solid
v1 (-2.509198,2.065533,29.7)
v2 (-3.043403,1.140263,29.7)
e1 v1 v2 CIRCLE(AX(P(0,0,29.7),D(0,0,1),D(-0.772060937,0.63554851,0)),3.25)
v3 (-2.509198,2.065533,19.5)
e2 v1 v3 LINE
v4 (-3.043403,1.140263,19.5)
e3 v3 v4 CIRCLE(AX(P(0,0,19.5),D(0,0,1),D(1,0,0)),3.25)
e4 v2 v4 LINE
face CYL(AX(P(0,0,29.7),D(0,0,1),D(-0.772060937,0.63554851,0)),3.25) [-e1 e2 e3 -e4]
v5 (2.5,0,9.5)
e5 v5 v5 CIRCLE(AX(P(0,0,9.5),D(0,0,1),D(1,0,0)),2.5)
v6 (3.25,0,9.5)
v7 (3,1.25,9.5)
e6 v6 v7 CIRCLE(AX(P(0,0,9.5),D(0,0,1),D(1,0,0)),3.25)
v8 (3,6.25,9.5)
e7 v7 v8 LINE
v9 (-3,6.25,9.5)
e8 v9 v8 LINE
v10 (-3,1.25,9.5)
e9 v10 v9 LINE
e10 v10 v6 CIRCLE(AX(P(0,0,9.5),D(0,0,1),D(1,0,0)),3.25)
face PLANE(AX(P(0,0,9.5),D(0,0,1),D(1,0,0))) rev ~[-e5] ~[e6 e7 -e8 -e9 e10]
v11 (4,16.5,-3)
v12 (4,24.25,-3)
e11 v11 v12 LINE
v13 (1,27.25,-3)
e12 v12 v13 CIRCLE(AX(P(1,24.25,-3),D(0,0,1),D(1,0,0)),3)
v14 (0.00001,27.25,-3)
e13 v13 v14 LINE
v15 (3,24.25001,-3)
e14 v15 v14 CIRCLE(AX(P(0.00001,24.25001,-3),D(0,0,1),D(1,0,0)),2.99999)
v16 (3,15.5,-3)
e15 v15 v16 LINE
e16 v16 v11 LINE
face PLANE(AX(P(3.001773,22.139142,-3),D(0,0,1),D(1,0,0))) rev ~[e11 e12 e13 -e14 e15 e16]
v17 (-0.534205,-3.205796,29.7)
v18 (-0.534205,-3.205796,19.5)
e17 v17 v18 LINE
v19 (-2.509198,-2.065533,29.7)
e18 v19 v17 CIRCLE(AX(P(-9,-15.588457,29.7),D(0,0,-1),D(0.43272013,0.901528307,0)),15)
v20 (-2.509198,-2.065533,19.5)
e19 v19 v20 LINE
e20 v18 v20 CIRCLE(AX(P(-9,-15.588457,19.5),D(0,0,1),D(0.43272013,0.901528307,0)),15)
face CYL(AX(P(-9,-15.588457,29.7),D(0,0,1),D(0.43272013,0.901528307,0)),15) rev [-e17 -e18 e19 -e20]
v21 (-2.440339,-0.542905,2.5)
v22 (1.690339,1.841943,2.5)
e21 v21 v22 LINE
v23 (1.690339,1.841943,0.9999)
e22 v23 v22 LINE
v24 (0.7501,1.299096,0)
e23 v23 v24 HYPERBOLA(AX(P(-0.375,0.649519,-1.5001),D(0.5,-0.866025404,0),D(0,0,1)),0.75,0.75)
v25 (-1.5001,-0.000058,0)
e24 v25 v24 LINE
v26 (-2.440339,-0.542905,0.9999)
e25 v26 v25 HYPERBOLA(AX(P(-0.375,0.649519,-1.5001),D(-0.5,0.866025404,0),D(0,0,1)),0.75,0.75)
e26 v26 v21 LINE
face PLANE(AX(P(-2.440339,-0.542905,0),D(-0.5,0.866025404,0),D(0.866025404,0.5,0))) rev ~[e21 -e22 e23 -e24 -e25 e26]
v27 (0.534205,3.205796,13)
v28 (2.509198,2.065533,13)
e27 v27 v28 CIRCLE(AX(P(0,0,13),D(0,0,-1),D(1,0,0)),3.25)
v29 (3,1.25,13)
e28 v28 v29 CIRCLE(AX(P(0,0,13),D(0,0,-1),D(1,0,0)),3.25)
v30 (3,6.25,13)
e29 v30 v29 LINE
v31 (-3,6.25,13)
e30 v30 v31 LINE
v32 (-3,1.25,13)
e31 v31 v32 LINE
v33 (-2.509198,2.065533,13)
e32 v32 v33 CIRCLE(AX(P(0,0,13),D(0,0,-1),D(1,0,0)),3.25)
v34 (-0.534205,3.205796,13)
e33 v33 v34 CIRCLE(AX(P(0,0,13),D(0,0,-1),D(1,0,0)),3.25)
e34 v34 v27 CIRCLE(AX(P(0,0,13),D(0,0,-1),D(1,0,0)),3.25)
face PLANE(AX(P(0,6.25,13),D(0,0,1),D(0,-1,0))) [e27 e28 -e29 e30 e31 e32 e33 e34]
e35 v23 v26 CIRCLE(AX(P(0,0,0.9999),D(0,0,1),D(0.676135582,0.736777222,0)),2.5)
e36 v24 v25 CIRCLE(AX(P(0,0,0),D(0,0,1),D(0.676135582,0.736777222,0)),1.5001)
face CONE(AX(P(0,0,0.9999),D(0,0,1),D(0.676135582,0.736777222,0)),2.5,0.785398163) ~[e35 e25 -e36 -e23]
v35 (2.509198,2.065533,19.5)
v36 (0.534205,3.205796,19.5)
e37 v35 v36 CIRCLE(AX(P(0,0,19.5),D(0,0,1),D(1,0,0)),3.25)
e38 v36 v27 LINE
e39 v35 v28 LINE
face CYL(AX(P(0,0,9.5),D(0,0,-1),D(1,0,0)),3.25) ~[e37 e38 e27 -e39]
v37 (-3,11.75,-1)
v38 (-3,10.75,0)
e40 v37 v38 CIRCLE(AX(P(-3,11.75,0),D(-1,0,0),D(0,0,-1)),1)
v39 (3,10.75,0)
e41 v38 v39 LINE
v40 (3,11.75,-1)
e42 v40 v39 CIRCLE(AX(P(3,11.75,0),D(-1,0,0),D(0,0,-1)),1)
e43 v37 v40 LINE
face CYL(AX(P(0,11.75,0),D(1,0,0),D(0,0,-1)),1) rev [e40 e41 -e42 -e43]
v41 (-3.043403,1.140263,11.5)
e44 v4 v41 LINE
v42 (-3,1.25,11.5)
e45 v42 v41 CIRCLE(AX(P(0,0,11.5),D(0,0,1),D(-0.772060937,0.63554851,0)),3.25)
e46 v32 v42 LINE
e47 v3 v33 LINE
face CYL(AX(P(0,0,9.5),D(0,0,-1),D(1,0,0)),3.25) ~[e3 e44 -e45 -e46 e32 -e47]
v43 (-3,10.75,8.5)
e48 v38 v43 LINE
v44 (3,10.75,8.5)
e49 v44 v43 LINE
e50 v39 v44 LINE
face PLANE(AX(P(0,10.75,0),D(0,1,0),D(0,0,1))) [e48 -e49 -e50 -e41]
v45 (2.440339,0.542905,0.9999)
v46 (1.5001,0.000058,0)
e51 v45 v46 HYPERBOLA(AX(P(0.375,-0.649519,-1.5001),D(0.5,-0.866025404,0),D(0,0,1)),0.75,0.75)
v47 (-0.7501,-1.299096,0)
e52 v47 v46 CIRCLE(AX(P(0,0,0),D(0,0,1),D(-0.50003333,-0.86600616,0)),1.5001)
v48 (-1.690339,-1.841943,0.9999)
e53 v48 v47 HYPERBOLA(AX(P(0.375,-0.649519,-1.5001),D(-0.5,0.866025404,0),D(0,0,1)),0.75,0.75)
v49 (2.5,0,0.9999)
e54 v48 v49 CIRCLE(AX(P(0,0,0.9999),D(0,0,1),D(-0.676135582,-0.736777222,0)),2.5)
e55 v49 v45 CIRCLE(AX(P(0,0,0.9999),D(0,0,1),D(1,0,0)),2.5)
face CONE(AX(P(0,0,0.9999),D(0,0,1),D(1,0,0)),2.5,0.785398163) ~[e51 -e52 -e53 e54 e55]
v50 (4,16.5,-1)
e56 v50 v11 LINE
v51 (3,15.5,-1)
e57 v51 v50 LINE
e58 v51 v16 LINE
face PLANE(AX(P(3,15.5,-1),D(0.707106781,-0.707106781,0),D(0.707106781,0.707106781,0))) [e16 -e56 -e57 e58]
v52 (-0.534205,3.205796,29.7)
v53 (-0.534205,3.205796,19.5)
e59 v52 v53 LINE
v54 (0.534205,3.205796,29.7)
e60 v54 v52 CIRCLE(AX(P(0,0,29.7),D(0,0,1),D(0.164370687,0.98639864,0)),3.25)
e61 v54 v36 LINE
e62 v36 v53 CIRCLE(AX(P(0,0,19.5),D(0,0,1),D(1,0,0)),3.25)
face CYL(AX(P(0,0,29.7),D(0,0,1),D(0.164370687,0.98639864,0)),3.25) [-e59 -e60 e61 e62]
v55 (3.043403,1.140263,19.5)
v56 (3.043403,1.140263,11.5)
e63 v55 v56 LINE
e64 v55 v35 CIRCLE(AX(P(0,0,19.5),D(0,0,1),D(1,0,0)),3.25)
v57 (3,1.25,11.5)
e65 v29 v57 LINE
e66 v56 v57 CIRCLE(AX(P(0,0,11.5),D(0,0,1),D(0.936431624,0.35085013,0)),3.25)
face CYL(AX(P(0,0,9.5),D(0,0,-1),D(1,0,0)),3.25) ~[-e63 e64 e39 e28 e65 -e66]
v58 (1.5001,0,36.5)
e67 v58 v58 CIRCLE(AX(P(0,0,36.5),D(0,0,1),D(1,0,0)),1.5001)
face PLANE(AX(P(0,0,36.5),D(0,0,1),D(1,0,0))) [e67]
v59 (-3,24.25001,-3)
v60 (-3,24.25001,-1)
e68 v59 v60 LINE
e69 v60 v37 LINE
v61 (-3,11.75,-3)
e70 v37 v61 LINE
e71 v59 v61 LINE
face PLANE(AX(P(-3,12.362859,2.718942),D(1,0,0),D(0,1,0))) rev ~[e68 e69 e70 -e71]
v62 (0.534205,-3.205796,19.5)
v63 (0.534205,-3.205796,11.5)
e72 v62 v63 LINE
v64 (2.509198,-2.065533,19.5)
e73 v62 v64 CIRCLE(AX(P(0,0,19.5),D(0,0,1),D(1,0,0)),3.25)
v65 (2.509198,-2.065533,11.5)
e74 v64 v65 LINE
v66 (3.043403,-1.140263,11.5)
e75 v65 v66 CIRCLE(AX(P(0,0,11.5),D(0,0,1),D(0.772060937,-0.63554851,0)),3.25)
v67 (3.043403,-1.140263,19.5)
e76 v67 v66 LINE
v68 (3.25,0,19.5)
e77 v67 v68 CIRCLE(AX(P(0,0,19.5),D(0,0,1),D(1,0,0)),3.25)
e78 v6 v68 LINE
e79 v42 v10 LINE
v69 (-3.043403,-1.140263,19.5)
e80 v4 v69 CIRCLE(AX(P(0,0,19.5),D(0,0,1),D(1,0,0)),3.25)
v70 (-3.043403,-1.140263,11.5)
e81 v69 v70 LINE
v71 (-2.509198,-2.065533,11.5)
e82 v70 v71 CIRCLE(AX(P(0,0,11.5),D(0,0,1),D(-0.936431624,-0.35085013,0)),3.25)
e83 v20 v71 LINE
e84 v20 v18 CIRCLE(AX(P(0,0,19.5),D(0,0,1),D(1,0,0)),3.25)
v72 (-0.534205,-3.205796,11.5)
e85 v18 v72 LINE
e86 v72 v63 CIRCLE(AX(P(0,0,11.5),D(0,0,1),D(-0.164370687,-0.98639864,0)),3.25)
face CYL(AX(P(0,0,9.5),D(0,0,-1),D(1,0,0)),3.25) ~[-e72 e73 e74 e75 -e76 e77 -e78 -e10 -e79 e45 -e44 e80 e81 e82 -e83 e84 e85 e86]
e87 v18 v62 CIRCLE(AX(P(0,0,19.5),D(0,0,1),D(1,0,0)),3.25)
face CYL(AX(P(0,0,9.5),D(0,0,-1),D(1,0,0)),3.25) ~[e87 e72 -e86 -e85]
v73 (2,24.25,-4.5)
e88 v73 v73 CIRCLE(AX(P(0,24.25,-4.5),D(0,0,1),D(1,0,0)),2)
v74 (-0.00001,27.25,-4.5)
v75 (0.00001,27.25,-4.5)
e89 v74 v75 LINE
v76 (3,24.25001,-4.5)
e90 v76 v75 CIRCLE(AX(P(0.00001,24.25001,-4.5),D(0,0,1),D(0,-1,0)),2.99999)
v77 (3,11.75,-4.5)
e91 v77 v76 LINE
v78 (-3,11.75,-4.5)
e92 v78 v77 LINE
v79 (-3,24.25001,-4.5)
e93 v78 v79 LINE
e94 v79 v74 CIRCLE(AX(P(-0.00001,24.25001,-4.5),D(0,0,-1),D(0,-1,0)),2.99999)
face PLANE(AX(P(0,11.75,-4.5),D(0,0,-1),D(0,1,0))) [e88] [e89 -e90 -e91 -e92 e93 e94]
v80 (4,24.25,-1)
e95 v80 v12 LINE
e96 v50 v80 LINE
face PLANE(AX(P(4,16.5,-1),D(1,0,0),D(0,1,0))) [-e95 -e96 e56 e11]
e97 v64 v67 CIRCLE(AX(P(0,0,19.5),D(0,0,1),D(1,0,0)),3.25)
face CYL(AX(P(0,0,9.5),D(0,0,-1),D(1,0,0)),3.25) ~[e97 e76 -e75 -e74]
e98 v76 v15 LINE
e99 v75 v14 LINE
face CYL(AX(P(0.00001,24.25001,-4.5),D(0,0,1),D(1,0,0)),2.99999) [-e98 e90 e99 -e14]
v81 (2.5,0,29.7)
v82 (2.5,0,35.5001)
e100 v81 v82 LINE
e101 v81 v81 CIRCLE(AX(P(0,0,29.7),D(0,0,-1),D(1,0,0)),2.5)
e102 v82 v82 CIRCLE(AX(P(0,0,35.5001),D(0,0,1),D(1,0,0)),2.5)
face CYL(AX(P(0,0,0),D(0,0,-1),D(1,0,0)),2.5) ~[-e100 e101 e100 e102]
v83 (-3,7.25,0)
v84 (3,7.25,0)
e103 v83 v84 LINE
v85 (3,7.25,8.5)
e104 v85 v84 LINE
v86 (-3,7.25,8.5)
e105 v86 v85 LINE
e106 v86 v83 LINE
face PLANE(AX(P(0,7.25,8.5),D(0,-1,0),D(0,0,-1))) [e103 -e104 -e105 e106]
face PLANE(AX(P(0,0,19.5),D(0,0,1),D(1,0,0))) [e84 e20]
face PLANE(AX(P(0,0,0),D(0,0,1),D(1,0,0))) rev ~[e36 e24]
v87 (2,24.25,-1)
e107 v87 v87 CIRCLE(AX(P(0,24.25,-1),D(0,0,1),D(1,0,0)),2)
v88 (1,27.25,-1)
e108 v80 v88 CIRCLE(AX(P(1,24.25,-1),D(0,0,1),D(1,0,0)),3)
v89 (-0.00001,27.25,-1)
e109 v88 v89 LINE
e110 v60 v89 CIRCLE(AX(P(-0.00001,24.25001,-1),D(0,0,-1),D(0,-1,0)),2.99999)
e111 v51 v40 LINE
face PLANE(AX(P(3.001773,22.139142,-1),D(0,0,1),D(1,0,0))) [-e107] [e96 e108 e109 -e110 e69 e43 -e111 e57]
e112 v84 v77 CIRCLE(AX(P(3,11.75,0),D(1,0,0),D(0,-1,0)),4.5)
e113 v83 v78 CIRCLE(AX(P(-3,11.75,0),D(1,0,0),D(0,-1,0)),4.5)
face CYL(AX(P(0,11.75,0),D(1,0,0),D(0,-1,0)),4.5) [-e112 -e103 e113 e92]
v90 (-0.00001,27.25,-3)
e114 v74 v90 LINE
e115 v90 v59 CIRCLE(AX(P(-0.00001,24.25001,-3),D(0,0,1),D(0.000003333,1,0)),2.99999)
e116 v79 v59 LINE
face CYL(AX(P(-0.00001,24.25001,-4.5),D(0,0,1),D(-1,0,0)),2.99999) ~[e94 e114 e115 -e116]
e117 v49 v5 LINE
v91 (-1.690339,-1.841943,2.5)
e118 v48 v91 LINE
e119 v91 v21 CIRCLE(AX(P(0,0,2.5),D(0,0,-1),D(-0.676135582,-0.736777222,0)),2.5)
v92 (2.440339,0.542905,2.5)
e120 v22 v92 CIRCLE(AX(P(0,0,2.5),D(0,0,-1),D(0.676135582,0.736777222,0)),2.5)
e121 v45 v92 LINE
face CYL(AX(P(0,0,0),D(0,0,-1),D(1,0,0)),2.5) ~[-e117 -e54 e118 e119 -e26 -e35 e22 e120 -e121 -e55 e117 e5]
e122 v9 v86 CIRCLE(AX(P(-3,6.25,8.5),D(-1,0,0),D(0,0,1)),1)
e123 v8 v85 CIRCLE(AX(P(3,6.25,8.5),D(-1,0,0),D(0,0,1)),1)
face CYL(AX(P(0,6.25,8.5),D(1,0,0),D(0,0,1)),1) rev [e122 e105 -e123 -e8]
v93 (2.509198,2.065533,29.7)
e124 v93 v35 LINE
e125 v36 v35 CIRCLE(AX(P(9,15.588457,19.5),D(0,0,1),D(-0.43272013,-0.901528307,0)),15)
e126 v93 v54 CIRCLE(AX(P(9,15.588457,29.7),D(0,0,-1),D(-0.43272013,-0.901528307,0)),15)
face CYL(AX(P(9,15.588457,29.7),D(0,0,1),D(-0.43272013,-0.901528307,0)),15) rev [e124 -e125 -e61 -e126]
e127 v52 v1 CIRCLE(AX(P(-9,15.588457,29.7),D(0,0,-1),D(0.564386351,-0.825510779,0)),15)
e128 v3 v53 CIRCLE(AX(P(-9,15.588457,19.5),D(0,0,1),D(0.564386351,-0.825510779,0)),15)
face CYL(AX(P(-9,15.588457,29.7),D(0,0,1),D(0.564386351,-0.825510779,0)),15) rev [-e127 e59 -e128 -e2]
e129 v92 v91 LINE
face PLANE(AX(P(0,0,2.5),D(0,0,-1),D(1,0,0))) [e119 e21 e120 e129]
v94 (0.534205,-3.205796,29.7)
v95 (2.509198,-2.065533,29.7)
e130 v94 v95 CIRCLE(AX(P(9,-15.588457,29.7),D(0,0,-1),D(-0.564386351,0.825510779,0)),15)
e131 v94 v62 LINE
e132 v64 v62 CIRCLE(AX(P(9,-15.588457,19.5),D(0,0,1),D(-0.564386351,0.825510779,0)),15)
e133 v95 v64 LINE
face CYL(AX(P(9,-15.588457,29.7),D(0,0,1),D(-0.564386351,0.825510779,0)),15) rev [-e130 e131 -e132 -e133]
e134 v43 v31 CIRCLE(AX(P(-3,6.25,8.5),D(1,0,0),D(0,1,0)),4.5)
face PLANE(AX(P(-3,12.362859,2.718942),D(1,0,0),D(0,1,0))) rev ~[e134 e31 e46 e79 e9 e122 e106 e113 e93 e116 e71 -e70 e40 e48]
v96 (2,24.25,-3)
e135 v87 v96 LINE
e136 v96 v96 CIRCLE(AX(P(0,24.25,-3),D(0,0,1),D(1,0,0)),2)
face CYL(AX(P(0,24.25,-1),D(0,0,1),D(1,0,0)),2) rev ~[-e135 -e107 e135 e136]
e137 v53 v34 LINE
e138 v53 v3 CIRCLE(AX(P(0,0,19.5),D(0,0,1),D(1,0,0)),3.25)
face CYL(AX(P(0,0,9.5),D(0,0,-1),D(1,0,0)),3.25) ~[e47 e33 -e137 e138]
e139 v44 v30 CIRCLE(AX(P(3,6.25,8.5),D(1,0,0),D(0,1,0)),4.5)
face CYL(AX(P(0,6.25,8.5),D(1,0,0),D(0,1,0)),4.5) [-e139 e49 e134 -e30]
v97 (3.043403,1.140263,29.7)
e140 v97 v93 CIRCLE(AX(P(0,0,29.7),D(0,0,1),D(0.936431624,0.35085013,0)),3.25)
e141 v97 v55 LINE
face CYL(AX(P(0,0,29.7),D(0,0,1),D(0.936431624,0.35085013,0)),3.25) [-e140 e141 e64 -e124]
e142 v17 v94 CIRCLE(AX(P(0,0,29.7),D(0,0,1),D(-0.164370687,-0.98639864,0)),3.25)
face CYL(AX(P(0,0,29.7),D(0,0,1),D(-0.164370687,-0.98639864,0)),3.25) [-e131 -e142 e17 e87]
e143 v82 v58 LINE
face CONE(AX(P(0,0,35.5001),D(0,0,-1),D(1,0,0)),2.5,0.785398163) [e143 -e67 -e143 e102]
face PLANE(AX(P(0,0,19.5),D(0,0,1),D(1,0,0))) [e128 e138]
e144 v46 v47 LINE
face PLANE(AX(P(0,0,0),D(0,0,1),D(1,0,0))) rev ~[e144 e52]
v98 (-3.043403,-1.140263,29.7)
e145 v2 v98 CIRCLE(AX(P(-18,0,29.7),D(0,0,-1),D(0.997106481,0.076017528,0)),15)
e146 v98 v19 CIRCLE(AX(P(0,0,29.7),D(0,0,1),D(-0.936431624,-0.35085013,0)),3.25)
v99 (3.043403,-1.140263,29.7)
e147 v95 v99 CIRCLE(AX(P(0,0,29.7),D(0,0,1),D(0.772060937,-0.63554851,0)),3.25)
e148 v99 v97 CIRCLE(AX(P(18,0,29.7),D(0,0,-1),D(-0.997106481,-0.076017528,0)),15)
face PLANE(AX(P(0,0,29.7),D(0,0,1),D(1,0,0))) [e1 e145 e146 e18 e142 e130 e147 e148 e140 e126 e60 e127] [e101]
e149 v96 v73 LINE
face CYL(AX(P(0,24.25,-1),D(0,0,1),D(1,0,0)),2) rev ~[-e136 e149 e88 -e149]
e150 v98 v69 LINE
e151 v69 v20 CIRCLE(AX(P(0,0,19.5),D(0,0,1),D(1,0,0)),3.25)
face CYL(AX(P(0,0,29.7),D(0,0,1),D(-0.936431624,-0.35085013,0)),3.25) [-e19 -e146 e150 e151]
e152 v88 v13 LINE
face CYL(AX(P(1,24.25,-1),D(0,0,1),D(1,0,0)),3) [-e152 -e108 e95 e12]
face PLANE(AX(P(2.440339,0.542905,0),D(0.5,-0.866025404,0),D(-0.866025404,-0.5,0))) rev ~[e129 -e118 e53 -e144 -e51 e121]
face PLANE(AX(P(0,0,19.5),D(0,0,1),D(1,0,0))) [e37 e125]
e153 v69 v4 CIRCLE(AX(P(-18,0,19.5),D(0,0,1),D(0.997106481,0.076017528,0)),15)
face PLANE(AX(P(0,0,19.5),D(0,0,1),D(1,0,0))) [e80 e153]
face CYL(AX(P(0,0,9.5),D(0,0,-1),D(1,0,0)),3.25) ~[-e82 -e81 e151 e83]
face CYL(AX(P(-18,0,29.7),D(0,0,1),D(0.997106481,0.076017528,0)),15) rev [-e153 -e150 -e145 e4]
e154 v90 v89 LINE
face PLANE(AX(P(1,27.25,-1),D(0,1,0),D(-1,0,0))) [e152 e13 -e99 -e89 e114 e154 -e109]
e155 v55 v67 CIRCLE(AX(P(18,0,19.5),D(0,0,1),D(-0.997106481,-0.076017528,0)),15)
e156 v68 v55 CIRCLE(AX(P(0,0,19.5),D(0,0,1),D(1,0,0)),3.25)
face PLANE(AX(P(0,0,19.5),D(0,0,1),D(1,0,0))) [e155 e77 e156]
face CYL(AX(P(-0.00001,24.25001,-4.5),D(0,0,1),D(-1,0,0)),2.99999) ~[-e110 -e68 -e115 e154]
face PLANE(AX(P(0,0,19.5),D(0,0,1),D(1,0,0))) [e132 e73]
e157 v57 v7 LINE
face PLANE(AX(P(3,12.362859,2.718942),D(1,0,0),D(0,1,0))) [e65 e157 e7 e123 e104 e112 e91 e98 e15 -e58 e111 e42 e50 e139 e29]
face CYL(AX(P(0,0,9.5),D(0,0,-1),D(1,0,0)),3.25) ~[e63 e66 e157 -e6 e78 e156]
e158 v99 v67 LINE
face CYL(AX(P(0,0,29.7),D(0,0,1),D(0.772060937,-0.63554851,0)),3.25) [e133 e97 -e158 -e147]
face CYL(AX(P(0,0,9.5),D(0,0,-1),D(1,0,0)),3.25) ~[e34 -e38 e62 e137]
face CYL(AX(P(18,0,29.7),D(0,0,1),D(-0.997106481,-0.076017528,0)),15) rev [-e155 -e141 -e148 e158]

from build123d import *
from build123d import SkipClean  # not in build123d's __all__

# Parameters (mm, degrees)
F0_R      = 2.5
F1_DEPTH  = 36.5
F3_START  = 9.5
F2_R      = 3.25
F3_DEPTH  = 10
F5_DEPTH  = 3
F7_START  = -6.8
F7_DEPTH  = 18.2
F8_R      = 2
F9_DEPTH  = 3.501
F10_R     = 2.99999
F12_DEPTH = 2.5
F13_SIZE  = 0.9999
F14_R     = 2
F15_DEPTH = 2


# Not quite as in the source:
# - a fillet or chamfer is up to 0.001 mm smaller than in the source, because OpenCascade refuses the exact size
# - after a boolean that leaves OpenCascade's solid faulty, fix() repairs it
# - ends of sketch curves that miss each other by under 0.0002 mm in the source are joined


with BuildPart() as f1:
    # F0 (on Top) → F1 (new body)
    with BuildSketch(Plane.XY):
        Circle(F0_R)
    extrude(amount=F1_DEPTH)

    # F2 (on Top) → F3 (join)
    with BuildSketch(Plane.XY.offset(F3_START)):
        Circle(F2_R)
    extrude(amount=F3_DEPTH)

    # F4 (on Right) → F5 (join, symmetric)
    with BuildSketch(Plane.YZ):
        with BuildLine():
            Line((0, 13), (0, 9.5))
            Line((0, 9.5), (6.25, 9.5))
            ThreePointArc((6.25, 9.5), (6.9571067812, 9.2071067812), (7.25, 8.5))
            Line((7.25, 8.5), (7.25, 0))
            ThreePointArc((7.25, 0), (8.5680194847, -3.1819805153), (11.75, -4.5))
            Line((11.75, -4.5), (27.25, -4.5))
            Line((27.25, -4.5), (27.25, -1))
            Line((27.25, -1), (11.75, -1))
            ThreePointArc((11.75, -1), (11.0428932188, -0.7071067812), (10.75, 0))
            Line((10.75, 0), (10.75, 8.5))
            ThreePointArc((10.75, 8.5), (9.4319805153, 11.6819805153), (6.25, 13))
            Line((6.25, 13), (0, 13))
        make_face()
    extrude(amount=F5_DEPTH, both=True)

    # F6 (on face) → F7 (join)
    with BuildSketch(Plane.XY.offset(36.5).offset(F7_START)):
        with BuildLine():
            ThreePointArc((3.0434027778, -1.1402629224), (3, 0), (3.0434027778, 1.1402629224))
            ThreePointArc((3.0434027778, 1.1402629224), (2.8145825623, 1.625), (2.5091980467, 2.0655326583))
            ThreePointArc((2.5091980467, 2.0655326583), (1.5, 2.5980762114), (0.5342047311, 3.2057955807))
            ThreePointArc((0.5342047311, 3.2057955807), (0, 3.25), (-0.5342047311, 3.2057955807))
            ThreePointArc((-0.5342047311, 3.2057955807), (-1.5, 2.5980762114), (-2.5091980467, 2.0655326583))
            ThreePointArc((-2.5091980467, 2.0655326583), (-2.8145825623, 1.625), (-3.0434027778, 1.1402629224))
            ThreePointArc((-3.0434027778, 1.1402629224), (-3, 0), (-3.0434027778, -1.1402629224))
            ThreePointArc((-3.0434027778, -1.1402629224), (-2.8145825623, -1.625), (-2.5091980467, -2.0655326583))
            ThreePointArc((-2.5091980467, -2.0655326583), (-1.5, -2.5980762114), (-0.5342047311, -3.2057955807))
            ThreePointArc((-0.5342047311, -3.2057955807), (0, -3.25), (0.5342047311, -3.2057955807))
            ThreePointArc((0.5342047311, -3.2057955807), (1.5, -2.5980762114), (2.5091980467, -2.0655326583))
            ThreePointArc((2.5091980467, -2.0655326583), (2.8145825623, -1.625), (3.0434027778, -1.1402629224))
        make_face()
    with SkipClean():  # cleaning this boolean's faces spoils the solid; the shape is the same uncleaned
        extrude(amount=-F7_DEPTH)

    # F8 (on face) → F9 (cut, through all)
    with BuildSketch(Plane.XY.offset(-1)):
        with Locations((0, 24.25)):
            Circle(F8_R)
    extrude(amount=-F9_DEPTH, mode=Mode.SUBTRACT)

    add(f1.part.fix(), mode=Mode.REPLACE)

    # F10 (radius 3 in the source; OpenCascade refuses exactly that, so slightly less here)
    f10_edges = [f1.edges().sort_by_distance(p)[0] for p in [
        (-3, 27.25, -2.75),
        (3, 27.25, -2.75),
    ]]
    fillet(f10_edges, radius=F10_R)

    # F11 (on face) → F12 (cut)
    with BuildSketch(Plane(origin=(0, 0, 0), x_dir=(1, 0, 0), z_dir=(0, 0, -1))):
        with BuildLine():
            ThreePointArc((1.6903389552, -1.8419430546), (2.1650635095, -1.25), (2.4403389552, -0.5429049489))
            Line((2.4403389552, -0.5429049489), (-1.6903389552, 1.8419430546))
            ThreePointArc((-1.6903389552, 1.8419430546), (-2.1650635095, 1.25), (-2.4403389552, 0.5429049489))
            Line((-2.4403389552, 0.5429049489), (1.6903389552, -1.8419430546))
        make_face()
    extrude(amount=-F12_DEPTH, mode=Mode.SUBTRACT)

    # F13 (size 1 in the source; OpenCascade refuses exactly that, so slightly less here)
    f13_edges = [f1.edges().sort_by_distance(p)[0] for p in [
        (-1.25, 2.165064, 0),
        (-2.5, 0, 36.5),
        (1.00602, -2.288651, 0),
    ]]
    chamfer(f13_edges, length=F13_SIZE)

    # F14 (on face) → F15 (join)
    with BuildSketch(Plane.XY.offset(-1)):
        with BuildLine():
            Line((3, 24.25), (3, 15.5))
            Line((3, 15.5), (4, 16.5))
            Line((4, 16.5), (4, 24.25))
            ThreePointArc((4, 24.25), (3.1213203436, 26.3713203436), (1, 27.25))
            Line((1, 27.25), (0, 27.25))
            ThreePointArc((0, 27.25), (2.1213203436, 26.3713203436), (3, 24.25))
        make_face()
        with BuildLine():
            Line((3, 11.75), (3, 15.5))
            Line((3, 15.5), (3, 24.25))
            ThreePointArc((3, 24.25), (2.1213203436, 26.3713203436), (0, 27.25))
            ThreePointArc((0, 27.25), (-2.1213232725, 26.3713232725), (-3, 24.25001))
            Line((-3, 24.25001), (-3, 11.75))
            Line((-3, 11.75), (3, 11.75))
        make_face()
        with Locations((0, 24.25)):
            Circle(F14_R, mode=Mode.SUBTRACT)
    extrude(amount=-F15_DEPTH)


solid = f1.part
